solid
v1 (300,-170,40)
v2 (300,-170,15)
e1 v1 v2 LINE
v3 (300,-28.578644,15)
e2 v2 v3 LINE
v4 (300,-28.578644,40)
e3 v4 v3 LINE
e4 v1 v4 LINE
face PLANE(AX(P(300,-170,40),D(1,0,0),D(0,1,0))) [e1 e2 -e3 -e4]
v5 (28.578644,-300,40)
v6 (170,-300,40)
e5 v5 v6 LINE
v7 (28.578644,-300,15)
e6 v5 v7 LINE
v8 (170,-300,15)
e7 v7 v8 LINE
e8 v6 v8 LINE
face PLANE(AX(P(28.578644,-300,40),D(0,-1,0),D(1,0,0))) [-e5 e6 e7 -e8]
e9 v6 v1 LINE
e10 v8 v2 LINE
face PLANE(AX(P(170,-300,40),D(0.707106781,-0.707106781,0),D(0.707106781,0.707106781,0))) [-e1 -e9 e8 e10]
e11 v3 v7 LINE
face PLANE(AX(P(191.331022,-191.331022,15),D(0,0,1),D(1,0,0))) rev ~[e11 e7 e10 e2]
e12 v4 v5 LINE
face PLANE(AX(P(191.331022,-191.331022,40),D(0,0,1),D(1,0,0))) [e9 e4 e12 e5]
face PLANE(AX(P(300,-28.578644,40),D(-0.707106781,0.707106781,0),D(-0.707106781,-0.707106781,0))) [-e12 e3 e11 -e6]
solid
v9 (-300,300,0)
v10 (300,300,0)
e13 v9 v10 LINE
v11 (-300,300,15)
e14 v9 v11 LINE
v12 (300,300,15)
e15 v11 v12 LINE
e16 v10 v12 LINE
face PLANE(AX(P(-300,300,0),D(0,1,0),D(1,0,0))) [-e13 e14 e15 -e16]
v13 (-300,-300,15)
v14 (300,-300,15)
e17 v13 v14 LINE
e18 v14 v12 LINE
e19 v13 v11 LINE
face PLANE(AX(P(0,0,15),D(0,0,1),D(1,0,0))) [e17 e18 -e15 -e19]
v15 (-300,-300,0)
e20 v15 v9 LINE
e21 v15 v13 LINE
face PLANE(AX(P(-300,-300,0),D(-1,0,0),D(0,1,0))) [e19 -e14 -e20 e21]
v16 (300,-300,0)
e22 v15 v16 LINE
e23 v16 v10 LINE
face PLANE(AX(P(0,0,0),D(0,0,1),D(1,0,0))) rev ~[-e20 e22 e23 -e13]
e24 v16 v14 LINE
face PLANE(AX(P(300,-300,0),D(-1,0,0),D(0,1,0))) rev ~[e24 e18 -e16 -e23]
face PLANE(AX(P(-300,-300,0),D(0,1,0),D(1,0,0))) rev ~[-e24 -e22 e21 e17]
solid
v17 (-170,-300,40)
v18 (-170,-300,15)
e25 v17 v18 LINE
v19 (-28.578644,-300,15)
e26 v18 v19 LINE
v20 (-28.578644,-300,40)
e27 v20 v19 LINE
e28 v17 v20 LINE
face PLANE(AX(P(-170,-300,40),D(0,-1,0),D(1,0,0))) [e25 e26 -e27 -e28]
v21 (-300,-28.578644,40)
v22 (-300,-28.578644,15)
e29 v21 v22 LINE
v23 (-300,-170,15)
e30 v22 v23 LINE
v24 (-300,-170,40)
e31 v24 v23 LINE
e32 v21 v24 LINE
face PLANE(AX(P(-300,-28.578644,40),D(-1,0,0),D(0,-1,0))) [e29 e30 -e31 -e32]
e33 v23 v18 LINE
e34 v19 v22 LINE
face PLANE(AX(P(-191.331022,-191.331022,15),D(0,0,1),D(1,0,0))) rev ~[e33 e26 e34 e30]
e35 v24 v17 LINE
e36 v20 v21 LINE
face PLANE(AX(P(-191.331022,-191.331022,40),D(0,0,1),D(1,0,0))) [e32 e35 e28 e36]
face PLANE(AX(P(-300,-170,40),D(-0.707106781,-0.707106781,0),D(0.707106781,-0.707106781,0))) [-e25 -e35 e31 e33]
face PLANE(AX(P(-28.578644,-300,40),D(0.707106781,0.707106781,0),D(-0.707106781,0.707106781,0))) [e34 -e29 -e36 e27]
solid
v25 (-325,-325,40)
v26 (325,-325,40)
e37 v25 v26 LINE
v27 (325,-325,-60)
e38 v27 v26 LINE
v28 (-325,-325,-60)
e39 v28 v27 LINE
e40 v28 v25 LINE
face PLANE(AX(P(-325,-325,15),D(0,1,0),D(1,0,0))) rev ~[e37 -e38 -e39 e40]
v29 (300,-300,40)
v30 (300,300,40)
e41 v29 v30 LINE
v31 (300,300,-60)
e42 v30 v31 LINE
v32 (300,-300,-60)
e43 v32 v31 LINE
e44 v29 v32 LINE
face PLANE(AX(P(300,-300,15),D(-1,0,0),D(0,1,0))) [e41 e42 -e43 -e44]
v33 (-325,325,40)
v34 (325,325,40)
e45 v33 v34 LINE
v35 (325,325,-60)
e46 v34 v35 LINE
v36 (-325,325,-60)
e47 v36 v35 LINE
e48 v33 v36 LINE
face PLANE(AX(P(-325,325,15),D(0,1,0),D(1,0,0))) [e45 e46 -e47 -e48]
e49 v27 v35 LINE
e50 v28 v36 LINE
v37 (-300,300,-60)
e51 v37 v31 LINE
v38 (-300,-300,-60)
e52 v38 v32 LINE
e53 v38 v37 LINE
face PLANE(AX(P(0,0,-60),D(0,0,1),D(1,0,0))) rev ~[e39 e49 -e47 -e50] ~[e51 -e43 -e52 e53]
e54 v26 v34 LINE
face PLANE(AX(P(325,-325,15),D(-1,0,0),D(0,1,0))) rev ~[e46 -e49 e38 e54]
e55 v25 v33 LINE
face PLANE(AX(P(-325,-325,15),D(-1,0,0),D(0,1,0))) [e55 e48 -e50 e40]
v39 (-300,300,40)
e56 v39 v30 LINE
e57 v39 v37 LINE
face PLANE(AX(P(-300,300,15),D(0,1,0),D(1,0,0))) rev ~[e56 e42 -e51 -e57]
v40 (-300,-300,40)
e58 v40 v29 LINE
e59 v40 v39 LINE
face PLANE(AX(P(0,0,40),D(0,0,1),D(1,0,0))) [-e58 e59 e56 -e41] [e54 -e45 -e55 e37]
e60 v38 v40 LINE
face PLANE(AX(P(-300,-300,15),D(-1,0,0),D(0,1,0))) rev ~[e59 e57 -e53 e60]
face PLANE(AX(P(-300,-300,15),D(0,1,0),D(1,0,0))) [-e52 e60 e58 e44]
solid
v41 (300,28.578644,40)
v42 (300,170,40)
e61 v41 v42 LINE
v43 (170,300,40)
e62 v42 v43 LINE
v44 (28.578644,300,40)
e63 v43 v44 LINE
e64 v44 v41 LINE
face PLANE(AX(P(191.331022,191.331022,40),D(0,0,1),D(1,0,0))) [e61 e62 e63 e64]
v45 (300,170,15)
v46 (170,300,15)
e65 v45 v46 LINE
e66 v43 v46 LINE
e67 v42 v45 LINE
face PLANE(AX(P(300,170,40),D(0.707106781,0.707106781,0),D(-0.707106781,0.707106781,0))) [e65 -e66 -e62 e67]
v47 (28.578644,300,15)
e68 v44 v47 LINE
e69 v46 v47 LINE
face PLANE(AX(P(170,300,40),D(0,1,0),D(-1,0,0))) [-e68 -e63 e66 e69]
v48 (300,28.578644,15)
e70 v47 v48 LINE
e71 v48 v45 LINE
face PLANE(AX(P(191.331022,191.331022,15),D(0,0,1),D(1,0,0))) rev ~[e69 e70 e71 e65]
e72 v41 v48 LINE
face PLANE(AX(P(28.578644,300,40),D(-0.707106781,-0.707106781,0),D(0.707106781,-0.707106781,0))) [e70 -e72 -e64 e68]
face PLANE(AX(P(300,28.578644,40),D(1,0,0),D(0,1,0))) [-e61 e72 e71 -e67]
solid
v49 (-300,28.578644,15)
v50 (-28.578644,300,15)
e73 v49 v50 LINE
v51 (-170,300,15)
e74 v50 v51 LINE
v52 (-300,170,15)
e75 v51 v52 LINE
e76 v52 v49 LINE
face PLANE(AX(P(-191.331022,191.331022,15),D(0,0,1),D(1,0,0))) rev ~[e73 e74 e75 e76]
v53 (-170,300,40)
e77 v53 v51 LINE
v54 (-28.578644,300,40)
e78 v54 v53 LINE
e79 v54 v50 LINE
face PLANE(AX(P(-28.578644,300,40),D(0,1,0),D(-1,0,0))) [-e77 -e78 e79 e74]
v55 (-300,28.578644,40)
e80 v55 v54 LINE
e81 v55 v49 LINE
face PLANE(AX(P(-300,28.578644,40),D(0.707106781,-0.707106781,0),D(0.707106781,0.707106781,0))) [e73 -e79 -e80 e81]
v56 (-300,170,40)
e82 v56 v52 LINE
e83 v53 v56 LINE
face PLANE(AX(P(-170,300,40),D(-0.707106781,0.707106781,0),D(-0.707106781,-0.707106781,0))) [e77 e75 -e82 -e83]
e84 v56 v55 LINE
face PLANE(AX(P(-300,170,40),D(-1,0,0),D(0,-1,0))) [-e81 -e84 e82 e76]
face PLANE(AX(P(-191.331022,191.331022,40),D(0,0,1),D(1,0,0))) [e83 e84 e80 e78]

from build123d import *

# Parameters (mm, degrees)
F0_W          = 600
F0_H          = 600
F1_DEPTH      = 15
F3_W          = 650
F3_H          = 650
F3_W_2        = 600
F3_H_2        = 600
F4_DEPTH      = 75
F4_DEPTH_BACK = 25
F6_DEPTH      = 25


with BuildPart() as f1:
    # F0 (on Top) → F1 (new body)
    with BuildSketch(Plane.XY):
        Rectangle(F0_W, F0_H)
    extrude(amount=F1_DEPTH)


with BuildPart() as f4:
    # F3 (on face) → F4 (new body, two sides)
    with BuildSketch(Plane.XY.offset(15)) as f4_sk:
        Rectangle(F3_W, F3_H)
        Rectangle(F3_W_2, F3_H_2, mode=Mode.SUBTRACT)
    extrude(amount=-F4_DEPTH)
    extrude(f4_sk.sketch, amount=F4_DEPTH_BACK)


with BuildPart() as f6:
    # F5 (on face) → F6 (new body)
    with BuildSketch(Plane.XY.offset(40)):
        Polygon((-28.5786437627, 300), (-170, 300), (-300, 170), (-300, 28.5786437627), align=None)
    extrude(amount=-F6_DEPTH)


with BuildPart() as f6b:
    # F5 (on face) → F6, piece 2 (new body)
    with BuildSketch(Plane.XY.offset(40)):
        Polygon((300, 170), (170, 300), (28.5786437627, 300), (300, 28.5786437627), align=None)
    extrude(amount=-F6_DEPTH)


with BuildPart() as f6c:
    # F5 (on face) → F6, piece 3 (new body)
    with BuildSketch(Plane.XY.offset(40)):
        Polygon((170, -300), (300, -170), (300, -28.5786437627), (28.5786437627, -300), align=None)
    extrude(amount=-F6_DEPTH)


with BuildPart() as f6d:
    # F5 (on face) → F6, piece 4 (new body)
    with BuildSketch(Plane.XY.offset(40)):
        Polygon((-28.5786437627, -300), (-300, -28.5786437627), (-300, -170), (-170, -300), align=None)
    extrude(amount=-F6_DEPTH)


solid = Compound([f1.part, f4.part, f6.part, f6b.part, f6c.part, f6d.part])
